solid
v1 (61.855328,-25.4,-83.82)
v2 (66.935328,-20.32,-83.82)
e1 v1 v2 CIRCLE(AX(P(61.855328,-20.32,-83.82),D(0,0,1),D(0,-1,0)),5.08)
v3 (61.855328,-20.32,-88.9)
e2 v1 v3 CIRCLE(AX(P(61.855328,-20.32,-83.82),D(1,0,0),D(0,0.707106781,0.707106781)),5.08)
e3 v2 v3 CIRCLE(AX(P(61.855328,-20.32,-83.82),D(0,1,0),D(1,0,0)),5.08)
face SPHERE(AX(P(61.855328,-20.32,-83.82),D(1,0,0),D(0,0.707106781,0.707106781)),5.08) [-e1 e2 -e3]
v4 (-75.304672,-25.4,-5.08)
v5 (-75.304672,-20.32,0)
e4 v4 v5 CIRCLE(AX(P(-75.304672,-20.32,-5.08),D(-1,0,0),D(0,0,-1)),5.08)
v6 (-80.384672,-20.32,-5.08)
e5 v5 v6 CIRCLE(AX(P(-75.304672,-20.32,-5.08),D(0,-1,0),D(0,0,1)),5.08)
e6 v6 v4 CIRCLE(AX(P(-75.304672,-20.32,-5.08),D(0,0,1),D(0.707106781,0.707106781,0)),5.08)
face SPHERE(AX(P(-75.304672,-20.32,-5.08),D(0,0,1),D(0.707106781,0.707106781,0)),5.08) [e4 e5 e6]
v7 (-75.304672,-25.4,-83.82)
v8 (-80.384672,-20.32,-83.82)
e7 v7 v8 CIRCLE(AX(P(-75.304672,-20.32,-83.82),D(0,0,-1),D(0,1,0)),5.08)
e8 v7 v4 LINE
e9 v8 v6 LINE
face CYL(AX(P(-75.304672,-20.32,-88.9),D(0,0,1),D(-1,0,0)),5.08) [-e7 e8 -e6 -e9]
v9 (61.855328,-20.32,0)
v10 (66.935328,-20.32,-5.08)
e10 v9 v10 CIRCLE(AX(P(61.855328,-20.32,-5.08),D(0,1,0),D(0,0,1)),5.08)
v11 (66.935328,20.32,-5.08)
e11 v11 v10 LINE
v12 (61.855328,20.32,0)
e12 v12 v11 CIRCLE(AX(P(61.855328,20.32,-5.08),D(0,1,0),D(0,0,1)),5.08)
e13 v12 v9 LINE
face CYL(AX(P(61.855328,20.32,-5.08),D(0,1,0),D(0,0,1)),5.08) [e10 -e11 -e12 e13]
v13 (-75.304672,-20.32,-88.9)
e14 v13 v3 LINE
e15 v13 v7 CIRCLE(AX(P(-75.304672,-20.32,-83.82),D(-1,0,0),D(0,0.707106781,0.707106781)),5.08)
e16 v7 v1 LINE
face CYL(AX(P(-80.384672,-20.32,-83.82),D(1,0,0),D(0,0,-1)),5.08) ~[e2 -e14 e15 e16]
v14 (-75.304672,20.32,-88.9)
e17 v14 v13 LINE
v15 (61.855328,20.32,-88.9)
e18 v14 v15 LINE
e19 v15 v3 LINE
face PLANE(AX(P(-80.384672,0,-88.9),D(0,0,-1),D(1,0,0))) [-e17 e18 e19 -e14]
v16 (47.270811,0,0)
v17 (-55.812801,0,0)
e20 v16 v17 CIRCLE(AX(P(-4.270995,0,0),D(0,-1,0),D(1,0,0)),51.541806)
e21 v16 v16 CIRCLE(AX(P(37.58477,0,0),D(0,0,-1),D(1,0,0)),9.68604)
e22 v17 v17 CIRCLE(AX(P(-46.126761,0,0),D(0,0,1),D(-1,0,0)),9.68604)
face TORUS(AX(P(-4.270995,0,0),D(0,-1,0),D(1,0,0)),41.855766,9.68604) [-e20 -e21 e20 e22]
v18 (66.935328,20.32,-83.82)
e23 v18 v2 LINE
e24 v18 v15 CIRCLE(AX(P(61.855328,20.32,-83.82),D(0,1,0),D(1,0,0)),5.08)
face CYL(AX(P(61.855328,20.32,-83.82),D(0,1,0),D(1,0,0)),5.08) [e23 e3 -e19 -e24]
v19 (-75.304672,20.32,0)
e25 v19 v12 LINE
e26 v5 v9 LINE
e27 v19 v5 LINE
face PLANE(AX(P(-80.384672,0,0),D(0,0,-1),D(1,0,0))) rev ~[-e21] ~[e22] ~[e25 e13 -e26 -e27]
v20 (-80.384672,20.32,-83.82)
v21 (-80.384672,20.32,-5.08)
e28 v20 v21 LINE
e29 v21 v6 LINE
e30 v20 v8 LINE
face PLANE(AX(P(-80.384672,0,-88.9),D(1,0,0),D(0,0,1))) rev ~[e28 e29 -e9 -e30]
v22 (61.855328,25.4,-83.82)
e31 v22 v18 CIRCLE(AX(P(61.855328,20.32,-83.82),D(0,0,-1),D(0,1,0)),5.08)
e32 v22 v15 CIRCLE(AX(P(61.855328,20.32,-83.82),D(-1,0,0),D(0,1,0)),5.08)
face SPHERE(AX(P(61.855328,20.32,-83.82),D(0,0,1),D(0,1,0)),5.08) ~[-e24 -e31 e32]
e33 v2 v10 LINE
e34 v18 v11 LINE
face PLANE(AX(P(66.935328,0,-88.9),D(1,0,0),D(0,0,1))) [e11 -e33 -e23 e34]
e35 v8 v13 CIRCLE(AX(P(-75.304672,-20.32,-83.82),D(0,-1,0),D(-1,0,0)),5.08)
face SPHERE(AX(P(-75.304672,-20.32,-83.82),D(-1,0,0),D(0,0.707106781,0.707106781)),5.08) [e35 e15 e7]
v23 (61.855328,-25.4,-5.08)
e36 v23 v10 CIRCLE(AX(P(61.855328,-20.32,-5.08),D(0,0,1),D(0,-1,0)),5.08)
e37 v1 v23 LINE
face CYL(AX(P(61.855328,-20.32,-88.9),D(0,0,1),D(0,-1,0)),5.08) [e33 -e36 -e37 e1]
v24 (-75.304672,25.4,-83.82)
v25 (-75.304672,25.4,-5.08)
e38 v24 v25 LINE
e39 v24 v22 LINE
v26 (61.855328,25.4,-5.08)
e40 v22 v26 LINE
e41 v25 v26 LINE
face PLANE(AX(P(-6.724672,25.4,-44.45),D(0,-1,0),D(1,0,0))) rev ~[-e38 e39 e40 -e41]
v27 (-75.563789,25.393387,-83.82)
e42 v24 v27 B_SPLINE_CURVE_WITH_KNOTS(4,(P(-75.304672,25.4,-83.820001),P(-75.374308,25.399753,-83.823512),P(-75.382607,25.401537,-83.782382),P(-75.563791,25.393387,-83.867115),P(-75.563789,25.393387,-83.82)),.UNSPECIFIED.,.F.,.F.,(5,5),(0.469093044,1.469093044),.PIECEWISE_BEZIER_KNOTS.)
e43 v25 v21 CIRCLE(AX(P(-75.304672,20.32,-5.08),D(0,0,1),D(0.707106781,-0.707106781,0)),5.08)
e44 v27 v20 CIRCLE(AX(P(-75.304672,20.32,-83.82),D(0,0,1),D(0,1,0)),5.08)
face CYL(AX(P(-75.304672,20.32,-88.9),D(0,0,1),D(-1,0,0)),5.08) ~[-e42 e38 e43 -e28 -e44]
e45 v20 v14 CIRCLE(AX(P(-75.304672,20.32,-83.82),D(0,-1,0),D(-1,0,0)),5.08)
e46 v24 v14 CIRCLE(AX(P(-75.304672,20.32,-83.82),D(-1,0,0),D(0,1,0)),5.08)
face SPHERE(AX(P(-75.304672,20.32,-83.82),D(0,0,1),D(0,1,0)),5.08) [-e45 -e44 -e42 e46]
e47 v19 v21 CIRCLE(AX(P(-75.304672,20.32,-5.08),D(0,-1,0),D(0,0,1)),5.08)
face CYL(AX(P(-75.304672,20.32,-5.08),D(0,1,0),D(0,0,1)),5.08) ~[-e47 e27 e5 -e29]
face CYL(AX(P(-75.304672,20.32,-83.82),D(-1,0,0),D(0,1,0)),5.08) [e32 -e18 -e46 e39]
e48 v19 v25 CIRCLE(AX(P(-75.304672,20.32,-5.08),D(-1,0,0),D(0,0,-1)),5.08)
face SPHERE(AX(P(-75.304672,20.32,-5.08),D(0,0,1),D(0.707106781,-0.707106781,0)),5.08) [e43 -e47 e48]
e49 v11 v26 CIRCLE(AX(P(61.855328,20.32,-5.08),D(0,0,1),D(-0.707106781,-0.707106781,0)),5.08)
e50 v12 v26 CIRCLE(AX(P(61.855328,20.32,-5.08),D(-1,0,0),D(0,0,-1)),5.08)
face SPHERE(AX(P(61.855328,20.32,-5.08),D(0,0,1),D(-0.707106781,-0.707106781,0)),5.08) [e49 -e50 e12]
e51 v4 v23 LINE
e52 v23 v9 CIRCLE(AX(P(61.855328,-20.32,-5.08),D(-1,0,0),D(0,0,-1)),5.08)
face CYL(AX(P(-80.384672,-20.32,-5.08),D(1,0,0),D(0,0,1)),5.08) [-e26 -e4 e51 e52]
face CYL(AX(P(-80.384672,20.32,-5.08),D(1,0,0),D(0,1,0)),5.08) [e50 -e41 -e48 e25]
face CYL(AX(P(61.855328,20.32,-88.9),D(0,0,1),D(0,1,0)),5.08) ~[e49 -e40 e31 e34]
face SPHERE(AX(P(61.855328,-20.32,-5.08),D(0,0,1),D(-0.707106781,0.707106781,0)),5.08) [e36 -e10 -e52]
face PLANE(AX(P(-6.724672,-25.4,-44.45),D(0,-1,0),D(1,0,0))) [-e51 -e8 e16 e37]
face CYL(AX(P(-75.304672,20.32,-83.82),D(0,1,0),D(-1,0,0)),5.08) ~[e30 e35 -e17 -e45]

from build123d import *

# Parameters (mm, degrees)
F1_R         = 9.6860400986
F3_W         = 147.32
F3_H         = 88.9
F4_DEPTH     = 25.4
F5_R         = 5.08
F6_T1_DEPTH  = 40.64
F6_S5_W      = 5.08
F6_S5_H      = 5.08
F6_T6_DEPTH  = 5.08
F6_S11_W     = 5.08
F6_S11_H     = 5.08
F6_T12_DEPTH = 5.08
F7_T1_DEPTH  = 40.64
F7_S5_W      = 5.08
F7_S5_H      = 5.08
F7_T6_DEPTH  = 5.08
F7_S11_W     = 5.08
F7_S11_H     = 5.08
F7_T12_DEPTH = 5.08
F8_T1_DEPTH  = 40.64
F8_T3_DEPTH  = 137.16
F8_S7_W      = 5.08
F8_S7_H      = 5.08
F8_T8_DEPTH  = 5.08
F8_S13_W     = 5.08
F8_S13_H     = 5.08
F8_T14_DEPTH = 5.08
F8_T18_ANGLE = 90
F8_T20_ANGLE = 90


# Not quite as in the source:
# - a fillet or chamfer that OpenCascade refuses, or shapes differently, is made with other operations: its cross-section is extruded or revolved along the edge and cut away or added


with BuildPart() as f2:
    # F2: sweep along a path in F0
    with BuildLine(Plane.XZ) as f2_path:
        ThreePointArc((37.5847704709, 0), (-4.2709950358, 41.8557655066), (-46.1267605424, 0))
    # F1 (on Top) → F2 (sweep)
    with BuildSketch(Plane.XY):
        with Locations((37.5847704709, 0)):
            Circle(F1_R)
    sweep(path=f2_path.line)

    # F3 (on Front) → F4 (join, symmetric)
    with BuildSketch(Plane.XZ):
        with Locations((-6.7246720757, -44.45)):
            Rectangle(F3_W, F3_H)
    extrude(amount=F4_DEPTH, both=True)

    # F5
    f5_edges = [f2.edges().sort_by_distance(p)[0] for p in [
        (-80.384672, -25.4, -44.45),
        (66.935328, -25.4, -44.45),
        (66.935328, 25.4, -44.45),
        (-80.384672, 25.4, -44.45),
        (-6.724672, 25.4, 0),
        (-6.724672, -25.4, -88.9),
        (-6.724672, -25.4, 0),
    ]]
    fillet(f5_edges, radius=F5_R)

    # F6: fillet of radius 5.08 on 1 edges, made by hand

    # F6_s2 → F6_t1 (cut)
    with BuildSketch(Plane.XZ.offset(-20.32)):
        with BuildLine():
            ThreePointArc((61.8553279243, 0), (65.4474303727, -1.4878975516), (66.9353279243, -5.08))
            Line((66.9353279243, -5.08), (66.9353279243, 0))
            Line((66.9353279243, 0), (61.8553279243, 0))
        make_face()
    extrude(amount=F6_T1_DEPTH, mode=Mode.SUBTRACT)


with BuildPart() as f6_tool4:
    # F6_s5 → F6_t6 (new body)
    with BuildSketch(Plane.XY.offset(-5.08)):
        with Locations((64.3953279243, -22.86)):
            Rectangle(F6_S5_W, F6_S5_H)
    extrude(amount=F6_T6_DEPTH)

    # F6_s7 → F6_t8 (revolve, cut)
    with BuildSketch(Plane(origin=(61.8553279243, -20.32, -5.08), x_dir=(-0.7071067812, 0.7071067812, 0), z_dir=(0.7071067812, 0.7071067812, 0))):
        with BuildLine():
            ThreePointArc((0, -5.08), (5.08, 0), (0, 5.08))
            Line((0, 5.08), (0, -5.08))
        make_face()
    revolve(axis=Axis((61.8553279243, -20.32, -5.08), (0, 0, 1)), mode=Mode.SUBTRACT)


with BuildPart() as f2_1:
    add(f2.part)

    # F6_t3: cut F6_tool4
    add(f6_tool4.part, mode=Mode.SUBTRACT)


with BuildPart() as f6_tool10:
    # F6_s11 → F6_t12 (new body)
    with BuildSketch(Plane.XY.offset(-5.08)):
        with Locations((64.3953279243, 22.86)):
            Rectangle(F6_S11_W, F6_S11_H)
    extrude(amount=F6_T12_DEPTH)

    # F6_s13 → F6_t14 (revolve, cut)
    with BuildSketch(Plane(origin=(61.8553279243, 20.32, -5.08), x_dir=(-0.7071067812, -0.7071067812, 0), z_dir=(-0.7071067812, 0.7071067812, 0))):
        with BuildLine():
            ThreePointArc((0, -5.08), (5.08, 0), (0, 5.08))
            Line((0, 5.08), (0, -5.08))
        make_face()
    revolve(axis=Axis((61.8553279243, 20.32, -5.08), (0, 0, 1)), mode=Mode.SUBTRACT)


with BuildPart() as f2_2:
    add(f2_1.part)

    # F6_t9: cut F6_tool10
    add(f6_tool10.part, mode=Mode.SUBTRACT)

    # F7: fillet of radius 5.08 on 1 edges, made by hand

    # F7_s2 → F7_t1 (cut)
    with BuildSketch(Plane.XZ.offset(-20.32)):
        with BuildLine():
            ThreePointArc((-75.3046720757, 0), (-78.8967745241, -1.4878975516), (-80.3846720757, -5.08))
            Line((-80.3846720757, -5.08), (-80.3846720757, 0))
            Line((-80.3846720757, 0), (-75.3046720757, 0))
        make_face()
    extrude(amount=F7_T1_DEPTH, mode=Mode.SUBTRACT)


with BuildPart() as f7_tool4:
    # F7_s5 → F7_t6 (new body)
    with BuildSketch(Plane.XY.offset(-5.08)):
        with Locations((-77.8446720757, 22.86)):
            Rectangle(F7_S5_W, F7_S5_H)
    extrude(amount=F7_T6_DEPTH)

    # F7_s7 → F7_t8 (revolve, cut)
    with BuildSketch(Plane(origin=(-75.3046720757, 20.32, -5.08), x_dir=(0.7071067812, -0.7071067812, 0), z_dir=(-0.7071067812, -0.7071067812, 0))):
        with BuildLine():
            ThreePointArc((0, -5.08), (5.08, 0), (0, 5.08))
            Line((0, 5.08), (0, -5.08))
        make_face()
    revolve(axis=Axis((-75.3046720757, 20.32, -5.08), (0, 0, 1)), mode=Mode.SUBTRACT)


with BuildPart() as f2_3:
    add(f2_2.part)

    # F7_t3: cut F7_tool4
    add(f7_tool4.part, mode=Mode.SUBTRACT)


with BuildPart() as f7_tool10:
    # F7_s11 → F7_t12 (new body)
    with BuildSketch(Plane.XY.offset(-5.08)):
        with Locations((-77.8446720757, -22.86)):
            Rectangle(F7_S11_W, F7_S11_H)
    extrude(amount=F7_T12_DEPTH)

    # F7_s13 → F7_t14 (revolve, cut)
    with BuildSketch(Plane(origin=(-75.3046720757, -20.32, -5.08), x_dir=(0.7071067812, 0.7071067812, 0), z_dir=(0.7071067812, -0.7071067812, 0))):
        with BuildLine():
            ThreePointArc((0, -5.08), (5.08, 0), (0, 5.08))
            Line((0, 5.08), (0, -5.08))
        make_face()
    revolve(axis=Axis((-75.3046720757, -20.32, -5.08), (0, 0, 1)), mode=Mode.SUBTRACT)


with BuildPart() as f2_4:
    add(f2_3.part)

    # F7_t9: cut F7_tool10
    add(f7_tool10.part, mode=Mode.SUBTRACT)

    # F8: fillet of radius 5.08 on 1 edges, made by hand

    # F8_s2 → F8_t1 (cut)
    with BuildSketch(Plane.XZ.offset(-20.32)):
        with BuildLine():
            ThreePointArc((-80.3846720757, -83.82), (-78.8967745241, -87.4121024484), (-75.3046720757, -88.9))
            Line((-75.3046720757, -88.9), (-80.3846720757, -88.9))
            Line((-80.3846720757, -88.9), (-80.3846720757, -83.82))
        make_face()
        with BuildLine():
            ThreePointArc((66.9353279243, -83.82), (65.4474303727, -87.4121024484), (61.8553279243, -88.9))
            Line((61.8553279243, -88.9), (66.9353279243, -88.9))
            Line((66.9353279243, -88.9), (66.9353279243, -83.82))
        make_face()
    extrude(amount=F8_T1_DEPTH, mode=Mode.SUBTRACT)

    # F8_s4 → F8_t3 (cut)
    with BuildSketch(Plane.YZ.offset(-75.3046720757)):
        with BuildLine():
            ThreePointArc((25.4, -83.82), (23.9121024484, -87.4121024484), (20.32, -88.9))
            Line((20.32, -88.9), (25.4, -88.9))
            Line((25.4, -88.9), (25.4, -83.82))
        make_face()
    extrude(amount=F8_T3_DEPTH, mode=Mode.SUBTRACT)


with BuildPart() as f8_tool6:
    # F8_s7 → F8_t8 (new body)
    with BuildSketch(Plane.YZ.offset(-75.3046720757)):
        with Locations((-22.86, -86.36)):
            Rectangle(F8_S7_W, F8_S7_H)
    extrude(amount=-F8_T8_DEPTH)

    # F8_s9 → F8_t10 (revolve, cut)
    with BuildSketch(Plane(origin=(-75.3046720757, -20.32, -83.82), x_dir=(0, 0.7071067812, 0.7071067812), z_dir=(0, -0.7071067812, 0.7071067812))):
        with BuildLine():
            ThreePointArc((0, -5.08), (5.08, 0), (0, 5.08))
            Line((0, 5.08), (0, -5.08))
        make_face()
    revolve(axis=Axis((-75.3046720757, -20.32, -83.82), (-1, 0, 0)), mode=Mode.SUBTRACT)


with BuildPart() as f2_5:
    add(f2_4.part)

    # F8_t5: cut F8_tool6
    add(f8_tool6.part, mode=Mode.SUBTRACT)


with BuildPart() as f8_tool12:
    # F8_s13 → F8_t14 (new body)
    with BuildSketch(Plane.YZ.offset(61.8553279243)):
        with Locations((-22.86, -86.36)):
            Rectangle(F8_S13_W, F8_S13_H)
    extrude(amount=F8_T14_DEPTH)

    # F8_s15 → F8_t16 (revolve, cut)
    with BuildSketch(Plane(origin=(61.8553279243, -20.32, -83.82), x_dir=(0, 0.7071067812, 0.7071067812), z_dir=(0, 0.7071067812, -0.7071067812))):
        with BuildLine():
            ThreePointArc((0, -5.08), (5.08, 0), (0, 5.08))
            Line((0, 5.08), (0, -5.08))
        make_face()
    revolve(axis=Axis((61.8553279243, -20.32, -83.82), (1, 0, 0)), mode=Mode.SUBTRACT)


with BuildPart() as f2_6:
    add(f2_5.part)

    # F8_t11: cut F8_tool12
    add(f8_tool12.part, mode=Mode.SUBTRACT)

    # F8_s17 → F8_t18 (revolve, cut)
    with BuildSketch(Plane.YZ.offset(-75.3046720757)):
        with BuildLine():
            ThreePointArc((20.32, -88.9), (23.9121024484, -87.4121024484), (25.4, -83.82))
            Line((25.4, -83.82), (25.4, -88.9))
            Line((25.4, -88.9), (20.32, -88.9))
        make_face()
    revolve(axis=Axis((-75.3046720757, 20.32, -88.9), (0, 0, 1)), revolution_arc=F8_T18_ANGLE, mode=Mode.SUBTRACT)

    # F8_s19 → F8_t20 (revolve, cut)
    with BuildSketch(Plane.YZ.offset(61.8553279243)):
        with BuildLine():
            ThreePointArc((20.32, -88.9), (23.9121024484, -87.4121024484), (25.4, -83.82))
            Line((25.4, -83.82), (25.4, -88.9))
            Line((25.4, -88.9), (20.32, -88.9))
        make_face()
    revolve(axis=Axis((61.8553279243, 20.32, -88.9), (0, 0, -1)), revolution_arc=F8_T20_ANGLE, mode=Mode.SUBTRACT)


solid = f2_6.part
